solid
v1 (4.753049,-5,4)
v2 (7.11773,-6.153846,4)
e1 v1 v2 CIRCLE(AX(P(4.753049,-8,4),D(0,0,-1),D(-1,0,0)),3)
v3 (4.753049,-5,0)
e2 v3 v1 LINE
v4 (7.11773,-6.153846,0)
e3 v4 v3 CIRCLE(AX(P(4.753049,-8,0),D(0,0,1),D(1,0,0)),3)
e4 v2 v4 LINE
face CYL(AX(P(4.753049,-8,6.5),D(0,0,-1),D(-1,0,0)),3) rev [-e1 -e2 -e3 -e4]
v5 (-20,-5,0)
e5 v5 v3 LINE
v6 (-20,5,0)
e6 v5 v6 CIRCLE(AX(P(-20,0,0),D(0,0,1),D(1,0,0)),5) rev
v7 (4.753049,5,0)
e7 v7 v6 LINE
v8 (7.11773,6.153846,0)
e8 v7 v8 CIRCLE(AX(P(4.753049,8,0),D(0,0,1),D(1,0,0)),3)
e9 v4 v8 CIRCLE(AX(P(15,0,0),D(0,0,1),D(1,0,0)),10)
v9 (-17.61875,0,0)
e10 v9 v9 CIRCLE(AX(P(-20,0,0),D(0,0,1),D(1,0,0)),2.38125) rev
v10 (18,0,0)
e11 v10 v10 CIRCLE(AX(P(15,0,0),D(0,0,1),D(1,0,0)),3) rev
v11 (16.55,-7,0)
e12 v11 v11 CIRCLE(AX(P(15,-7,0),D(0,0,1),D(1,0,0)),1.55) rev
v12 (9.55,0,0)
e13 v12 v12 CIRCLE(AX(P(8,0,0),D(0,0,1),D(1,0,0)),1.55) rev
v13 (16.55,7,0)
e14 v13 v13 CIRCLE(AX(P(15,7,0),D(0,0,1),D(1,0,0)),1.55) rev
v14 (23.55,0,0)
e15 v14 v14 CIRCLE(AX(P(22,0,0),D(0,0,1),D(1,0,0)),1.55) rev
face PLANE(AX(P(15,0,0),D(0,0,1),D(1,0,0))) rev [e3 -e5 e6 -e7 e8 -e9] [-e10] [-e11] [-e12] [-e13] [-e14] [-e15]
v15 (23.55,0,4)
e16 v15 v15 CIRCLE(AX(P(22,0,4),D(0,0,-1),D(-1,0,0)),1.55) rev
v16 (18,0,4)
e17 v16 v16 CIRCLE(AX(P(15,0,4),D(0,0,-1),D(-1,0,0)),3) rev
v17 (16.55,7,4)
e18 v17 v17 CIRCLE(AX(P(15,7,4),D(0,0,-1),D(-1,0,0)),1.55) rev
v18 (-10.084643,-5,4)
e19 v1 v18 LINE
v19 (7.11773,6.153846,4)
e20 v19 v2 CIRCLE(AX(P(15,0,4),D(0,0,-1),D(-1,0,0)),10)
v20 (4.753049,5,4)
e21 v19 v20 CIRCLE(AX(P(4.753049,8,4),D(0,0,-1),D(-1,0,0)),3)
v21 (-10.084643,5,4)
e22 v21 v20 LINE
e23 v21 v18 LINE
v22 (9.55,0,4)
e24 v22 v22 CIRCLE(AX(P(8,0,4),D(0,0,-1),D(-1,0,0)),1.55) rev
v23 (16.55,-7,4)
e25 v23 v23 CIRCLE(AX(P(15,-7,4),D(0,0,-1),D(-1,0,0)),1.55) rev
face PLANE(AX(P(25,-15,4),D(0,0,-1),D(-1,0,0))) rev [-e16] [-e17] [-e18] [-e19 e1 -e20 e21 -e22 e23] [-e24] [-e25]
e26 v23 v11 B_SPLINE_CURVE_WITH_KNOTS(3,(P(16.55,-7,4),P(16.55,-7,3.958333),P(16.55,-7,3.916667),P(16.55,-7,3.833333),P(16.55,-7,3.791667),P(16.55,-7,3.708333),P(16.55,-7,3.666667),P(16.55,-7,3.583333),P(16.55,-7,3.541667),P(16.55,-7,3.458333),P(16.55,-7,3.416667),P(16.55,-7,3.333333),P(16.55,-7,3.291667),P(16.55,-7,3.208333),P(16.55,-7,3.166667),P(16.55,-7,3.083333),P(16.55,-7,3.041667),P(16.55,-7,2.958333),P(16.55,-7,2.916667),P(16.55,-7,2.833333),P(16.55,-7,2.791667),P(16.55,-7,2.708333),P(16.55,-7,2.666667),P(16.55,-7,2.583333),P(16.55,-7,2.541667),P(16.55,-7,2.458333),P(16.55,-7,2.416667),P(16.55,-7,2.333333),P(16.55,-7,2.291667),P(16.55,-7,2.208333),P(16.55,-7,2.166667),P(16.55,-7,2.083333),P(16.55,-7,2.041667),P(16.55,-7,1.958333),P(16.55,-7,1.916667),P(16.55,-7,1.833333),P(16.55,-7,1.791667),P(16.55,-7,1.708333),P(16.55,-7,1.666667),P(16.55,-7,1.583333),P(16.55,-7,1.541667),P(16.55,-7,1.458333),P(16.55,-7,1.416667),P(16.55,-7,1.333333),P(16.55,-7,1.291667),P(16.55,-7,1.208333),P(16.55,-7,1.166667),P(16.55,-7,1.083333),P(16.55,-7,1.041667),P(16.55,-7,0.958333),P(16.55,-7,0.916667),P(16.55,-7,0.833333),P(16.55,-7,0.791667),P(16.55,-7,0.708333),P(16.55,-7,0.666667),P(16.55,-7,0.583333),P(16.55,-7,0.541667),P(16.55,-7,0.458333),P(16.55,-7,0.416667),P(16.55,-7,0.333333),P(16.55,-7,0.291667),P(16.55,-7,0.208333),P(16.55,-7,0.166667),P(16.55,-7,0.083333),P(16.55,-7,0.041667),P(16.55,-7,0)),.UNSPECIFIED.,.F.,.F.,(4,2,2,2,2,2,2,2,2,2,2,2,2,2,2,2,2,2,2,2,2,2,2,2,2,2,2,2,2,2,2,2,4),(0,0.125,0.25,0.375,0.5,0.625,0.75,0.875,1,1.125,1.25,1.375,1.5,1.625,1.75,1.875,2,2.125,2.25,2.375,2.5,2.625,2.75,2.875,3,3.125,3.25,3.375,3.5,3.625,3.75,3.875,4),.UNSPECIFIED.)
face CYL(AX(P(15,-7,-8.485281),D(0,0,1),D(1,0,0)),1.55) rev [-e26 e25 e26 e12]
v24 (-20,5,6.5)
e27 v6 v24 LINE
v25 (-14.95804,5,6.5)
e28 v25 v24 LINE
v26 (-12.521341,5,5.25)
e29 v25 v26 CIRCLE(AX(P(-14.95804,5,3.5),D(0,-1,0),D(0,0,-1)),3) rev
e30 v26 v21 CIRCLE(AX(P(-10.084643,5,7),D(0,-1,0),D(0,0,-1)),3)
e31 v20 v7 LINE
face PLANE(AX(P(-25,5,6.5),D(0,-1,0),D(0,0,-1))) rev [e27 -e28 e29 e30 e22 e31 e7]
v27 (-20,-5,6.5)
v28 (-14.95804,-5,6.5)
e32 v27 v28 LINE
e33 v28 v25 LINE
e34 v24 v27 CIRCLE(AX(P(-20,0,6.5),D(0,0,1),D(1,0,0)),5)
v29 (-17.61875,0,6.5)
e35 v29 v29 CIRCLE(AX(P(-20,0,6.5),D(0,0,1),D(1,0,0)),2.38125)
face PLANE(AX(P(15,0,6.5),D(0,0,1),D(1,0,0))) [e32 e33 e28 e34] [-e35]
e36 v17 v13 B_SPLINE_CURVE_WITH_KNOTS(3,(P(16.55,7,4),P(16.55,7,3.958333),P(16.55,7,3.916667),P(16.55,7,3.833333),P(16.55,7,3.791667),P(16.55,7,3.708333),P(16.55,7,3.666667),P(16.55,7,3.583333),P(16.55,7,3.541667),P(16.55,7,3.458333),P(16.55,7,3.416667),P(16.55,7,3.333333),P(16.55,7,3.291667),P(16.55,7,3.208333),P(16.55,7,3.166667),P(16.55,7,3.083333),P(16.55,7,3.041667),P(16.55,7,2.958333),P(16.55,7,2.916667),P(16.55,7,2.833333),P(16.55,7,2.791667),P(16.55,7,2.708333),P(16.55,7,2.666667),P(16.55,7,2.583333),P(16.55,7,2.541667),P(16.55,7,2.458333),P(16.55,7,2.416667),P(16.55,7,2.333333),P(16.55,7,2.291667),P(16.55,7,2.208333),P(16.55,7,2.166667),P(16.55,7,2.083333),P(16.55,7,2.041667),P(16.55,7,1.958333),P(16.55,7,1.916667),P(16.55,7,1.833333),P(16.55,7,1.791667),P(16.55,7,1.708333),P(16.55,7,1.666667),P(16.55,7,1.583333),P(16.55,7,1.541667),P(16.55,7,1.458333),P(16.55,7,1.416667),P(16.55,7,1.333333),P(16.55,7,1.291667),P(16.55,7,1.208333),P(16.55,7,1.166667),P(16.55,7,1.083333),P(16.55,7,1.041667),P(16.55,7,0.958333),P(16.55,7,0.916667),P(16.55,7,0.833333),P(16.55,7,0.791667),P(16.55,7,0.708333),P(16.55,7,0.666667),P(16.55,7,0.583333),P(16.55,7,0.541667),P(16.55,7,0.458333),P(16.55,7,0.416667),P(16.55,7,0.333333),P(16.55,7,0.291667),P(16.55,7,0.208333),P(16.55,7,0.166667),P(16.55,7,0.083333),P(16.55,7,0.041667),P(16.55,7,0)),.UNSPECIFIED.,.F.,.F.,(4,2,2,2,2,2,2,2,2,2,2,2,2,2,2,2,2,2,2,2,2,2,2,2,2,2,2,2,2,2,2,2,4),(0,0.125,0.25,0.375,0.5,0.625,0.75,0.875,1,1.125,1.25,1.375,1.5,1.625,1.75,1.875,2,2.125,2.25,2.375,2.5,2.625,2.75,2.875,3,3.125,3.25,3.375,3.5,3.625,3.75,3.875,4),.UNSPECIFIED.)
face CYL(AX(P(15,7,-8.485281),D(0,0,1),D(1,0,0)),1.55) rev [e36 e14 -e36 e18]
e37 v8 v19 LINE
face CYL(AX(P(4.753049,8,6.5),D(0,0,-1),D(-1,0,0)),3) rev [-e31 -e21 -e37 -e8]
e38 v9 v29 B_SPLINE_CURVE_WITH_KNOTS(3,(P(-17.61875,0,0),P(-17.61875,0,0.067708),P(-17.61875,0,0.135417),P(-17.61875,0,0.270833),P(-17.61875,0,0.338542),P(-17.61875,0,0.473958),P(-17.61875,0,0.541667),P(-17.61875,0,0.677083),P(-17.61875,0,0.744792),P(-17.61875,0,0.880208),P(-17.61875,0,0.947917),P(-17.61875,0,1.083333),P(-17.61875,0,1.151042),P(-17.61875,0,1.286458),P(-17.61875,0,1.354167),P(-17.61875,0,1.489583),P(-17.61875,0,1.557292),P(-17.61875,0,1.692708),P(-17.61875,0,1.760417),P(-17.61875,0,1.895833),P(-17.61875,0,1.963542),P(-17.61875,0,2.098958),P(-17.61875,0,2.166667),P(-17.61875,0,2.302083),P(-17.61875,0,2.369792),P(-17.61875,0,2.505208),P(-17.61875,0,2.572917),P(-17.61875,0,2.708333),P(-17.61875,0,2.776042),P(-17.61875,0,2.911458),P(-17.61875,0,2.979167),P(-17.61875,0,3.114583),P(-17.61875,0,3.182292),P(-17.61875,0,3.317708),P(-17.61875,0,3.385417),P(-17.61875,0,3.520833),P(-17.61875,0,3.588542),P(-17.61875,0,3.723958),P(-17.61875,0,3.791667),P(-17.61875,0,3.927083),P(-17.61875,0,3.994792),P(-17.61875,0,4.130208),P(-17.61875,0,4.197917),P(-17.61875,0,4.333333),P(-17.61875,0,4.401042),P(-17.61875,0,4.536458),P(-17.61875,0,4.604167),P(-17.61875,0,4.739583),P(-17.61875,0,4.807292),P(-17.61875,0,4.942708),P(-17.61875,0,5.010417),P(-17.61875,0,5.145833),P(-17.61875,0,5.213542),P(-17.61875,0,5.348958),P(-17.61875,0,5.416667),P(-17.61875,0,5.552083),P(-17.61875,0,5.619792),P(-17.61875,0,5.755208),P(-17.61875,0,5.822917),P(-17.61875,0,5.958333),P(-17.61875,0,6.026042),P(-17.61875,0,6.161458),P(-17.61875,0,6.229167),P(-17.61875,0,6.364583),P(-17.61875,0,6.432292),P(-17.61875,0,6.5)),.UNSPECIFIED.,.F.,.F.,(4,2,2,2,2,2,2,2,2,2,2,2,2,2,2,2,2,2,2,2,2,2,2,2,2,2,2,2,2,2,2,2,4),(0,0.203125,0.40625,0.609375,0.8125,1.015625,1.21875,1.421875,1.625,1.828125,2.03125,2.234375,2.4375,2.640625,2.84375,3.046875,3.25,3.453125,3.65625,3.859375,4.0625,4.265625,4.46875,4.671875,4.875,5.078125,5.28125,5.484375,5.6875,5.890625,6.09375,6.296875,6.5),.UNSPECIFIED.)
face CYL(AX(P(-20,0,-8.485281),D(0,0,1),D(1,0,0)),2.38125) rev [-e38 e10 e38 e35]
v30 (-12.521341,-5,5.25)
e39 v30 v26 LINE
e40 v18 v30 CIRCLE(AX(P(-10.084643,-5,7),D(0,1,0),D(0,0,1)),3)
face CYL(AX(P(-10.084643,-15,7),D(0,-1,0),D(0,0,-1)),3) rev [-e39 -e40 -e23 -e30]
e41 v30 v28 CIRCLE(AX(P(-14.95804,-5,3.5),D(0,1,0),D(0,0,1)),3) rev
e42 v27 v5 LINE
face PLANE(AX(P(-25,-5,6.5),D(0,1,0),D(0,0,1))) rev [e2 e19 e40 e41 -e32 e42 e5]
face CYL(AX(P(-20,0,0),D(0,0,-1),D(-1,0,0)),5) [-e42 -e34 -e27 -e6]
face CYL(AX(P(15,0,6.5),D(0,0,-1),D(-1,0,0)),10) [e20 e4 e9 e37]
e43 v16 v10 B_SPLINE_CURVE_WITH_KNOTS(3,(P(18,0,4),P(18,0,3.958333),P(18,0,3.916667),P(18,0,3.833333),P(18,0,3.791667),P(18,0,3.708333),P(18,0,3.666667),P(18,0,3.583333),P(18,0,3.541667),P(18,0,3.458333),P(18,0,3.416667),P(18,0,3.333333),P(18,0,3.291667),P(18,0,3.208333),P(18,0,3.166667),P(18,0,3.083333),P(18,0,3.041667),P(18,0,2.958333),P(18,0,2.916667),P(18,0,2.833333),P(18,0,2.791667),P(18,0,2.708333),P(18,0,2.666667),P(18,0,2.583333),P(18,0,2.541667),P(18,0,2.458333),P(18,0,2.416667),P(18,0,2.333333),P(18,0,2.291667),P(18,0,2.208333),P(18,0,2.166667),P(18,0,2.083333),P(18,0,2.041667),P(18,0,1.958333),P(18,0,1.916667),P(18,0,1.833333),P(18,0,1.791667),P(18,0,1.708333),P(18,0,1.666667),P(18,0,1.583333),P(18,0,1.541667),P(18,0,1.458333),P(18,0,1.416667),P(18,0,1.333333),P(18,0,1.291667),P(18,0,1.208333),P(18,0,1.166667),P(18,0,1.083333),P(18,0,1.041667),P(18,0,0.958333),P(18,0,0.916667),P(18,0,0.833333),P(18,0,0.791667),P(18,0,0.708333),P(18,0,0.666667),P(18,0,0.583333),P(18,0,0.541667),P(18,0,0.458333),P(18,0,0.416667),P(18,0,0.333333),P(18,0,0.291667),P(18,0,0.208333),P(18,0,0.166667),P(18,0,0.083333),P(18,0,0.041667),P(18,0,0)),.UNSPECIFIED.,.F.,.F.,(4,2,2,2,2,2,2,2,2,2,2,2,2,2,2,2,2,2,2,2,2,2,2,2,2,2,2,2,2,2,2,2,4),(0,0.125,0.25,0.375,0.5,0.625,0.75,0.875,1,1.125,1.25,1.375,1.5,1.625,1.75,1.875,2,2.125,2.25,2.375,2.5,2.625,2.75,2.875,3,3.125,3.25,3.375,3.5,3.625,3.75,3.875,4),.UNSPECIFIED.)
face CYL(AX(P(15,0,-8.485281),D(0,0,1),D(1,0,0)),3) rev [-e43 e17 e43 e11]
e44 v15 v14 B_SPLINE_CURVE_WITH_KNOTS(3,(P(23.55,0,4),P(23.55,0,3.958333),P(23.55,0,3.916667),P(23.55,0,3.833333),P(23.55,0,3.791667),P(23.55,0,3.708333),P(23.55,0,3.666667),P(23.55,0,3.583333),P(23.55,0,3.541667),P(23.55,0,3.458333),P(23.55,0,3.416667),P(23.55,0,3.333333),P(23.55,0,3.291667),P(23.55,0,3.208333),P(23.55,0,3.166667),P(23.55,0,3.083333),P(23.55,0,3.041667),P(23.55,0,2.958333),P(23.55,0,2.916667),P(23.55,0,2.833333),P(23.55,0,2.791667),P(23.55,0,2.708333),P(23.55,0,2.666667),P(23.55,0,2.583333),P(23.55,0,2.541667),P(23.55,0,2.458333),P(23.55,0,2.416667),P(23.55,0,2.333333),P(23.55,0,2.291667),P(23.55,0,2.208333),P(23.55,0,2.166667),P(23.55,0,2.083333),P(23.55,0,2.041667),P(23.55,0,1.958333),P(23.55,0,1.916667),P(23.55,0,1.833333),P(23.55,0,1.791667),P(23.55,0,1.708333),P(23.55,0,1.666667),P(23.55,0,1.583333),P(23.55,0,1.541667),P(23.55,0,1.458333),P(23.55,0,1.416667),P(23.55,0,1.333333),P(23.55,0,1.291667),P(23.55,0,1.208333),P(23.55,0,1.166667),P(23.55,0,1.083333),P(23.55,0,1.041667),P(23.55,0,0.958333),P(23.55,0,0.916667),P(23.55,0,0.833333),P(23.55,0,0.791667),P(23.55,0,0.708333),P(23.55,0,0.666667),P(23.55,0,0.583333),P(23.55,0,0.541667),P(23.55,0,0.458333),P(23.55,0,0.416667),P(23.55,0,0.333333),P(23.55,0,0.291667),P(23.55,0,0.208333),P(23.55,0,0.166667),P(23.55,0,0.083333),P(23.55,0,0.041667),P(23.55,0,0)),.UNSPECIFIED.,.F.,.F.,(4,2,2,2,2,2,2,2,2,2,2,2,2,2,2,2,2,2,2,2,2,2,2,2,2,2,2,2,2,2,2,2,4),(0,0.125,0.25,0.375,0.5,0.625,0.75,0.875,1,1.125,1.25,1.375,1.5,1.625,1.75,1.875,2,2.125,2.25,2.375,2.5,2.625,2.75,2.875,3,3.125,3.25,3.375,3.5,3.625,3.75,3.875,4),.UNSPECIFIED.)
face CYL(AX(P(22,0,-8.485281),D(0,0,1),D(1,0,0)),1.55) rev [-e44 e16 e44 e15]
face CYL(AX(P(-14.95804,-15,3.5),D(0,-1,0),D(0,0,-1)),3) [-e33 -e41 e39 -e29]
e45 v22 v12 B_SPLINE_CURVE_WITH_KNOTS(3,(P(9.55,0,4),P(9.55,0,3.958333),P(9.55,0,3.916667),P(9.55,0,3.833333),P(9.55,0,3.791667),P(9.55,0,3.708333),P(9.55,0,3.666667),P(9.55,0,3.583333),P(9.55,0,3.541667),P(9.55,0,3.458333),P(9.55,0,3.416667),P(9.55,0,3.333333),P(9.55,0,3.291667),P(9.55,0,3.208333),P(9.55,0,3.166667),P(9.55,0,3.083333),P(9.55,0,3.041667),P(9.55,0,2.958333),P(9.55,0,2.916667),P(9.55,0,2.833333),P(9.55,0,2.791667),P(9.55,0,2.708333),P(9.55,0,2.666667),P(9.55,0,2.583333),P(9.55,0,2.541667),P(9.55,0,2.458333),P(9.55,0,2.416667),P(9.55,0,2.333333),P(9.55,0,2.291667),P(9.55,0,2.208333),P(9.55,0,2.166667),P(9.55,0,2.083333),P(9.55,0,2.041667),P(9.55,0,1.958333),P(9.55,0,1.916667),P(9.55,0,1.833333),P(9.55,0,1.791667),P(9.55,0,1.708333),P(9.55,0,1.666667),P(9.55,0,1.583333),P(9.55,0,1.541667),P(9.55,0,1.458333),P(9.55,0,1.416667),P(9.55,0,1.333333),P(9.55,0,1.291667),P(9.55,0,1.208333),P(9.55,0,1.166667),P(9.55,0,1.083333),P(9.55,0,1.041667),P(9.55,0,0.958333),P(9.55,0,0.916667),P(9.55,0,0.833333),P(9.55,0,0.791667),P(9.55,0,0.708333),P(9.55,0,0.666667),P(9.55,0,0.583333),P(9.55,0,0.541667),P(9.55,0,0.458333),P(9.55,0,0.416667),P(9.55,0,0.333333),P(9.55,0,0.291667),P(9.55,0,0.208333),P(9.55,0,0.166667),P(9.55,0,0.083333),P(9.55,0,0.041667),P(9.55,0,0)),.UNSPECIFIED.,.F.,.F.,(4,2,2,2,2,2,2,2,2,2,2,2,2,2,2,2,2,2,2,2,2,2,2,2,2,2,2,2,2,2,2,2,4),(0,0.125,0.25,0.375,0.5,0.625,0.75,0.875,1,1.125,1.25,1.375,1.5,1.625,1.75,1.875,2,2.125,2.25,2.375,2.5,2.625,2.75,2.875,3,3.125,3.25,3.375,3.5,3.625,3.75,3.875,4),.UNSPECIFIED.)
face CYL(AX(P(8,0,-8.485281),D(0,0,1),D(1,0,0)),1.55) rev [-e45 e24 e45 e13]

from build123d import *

# Parameters (mm, degrees)
BOSS_EXTRUDE3_DEPTH = 6.5
SKETCH9_R           = 2.38125
SKETCH9_R_2         = 3
SKETCH9_R_3         = 1.55
CUT_EXTRUDE4_DEPTH  = 6.5
SKETCH10_W          = 37
SKETCH10_H          = 2.5
CUT_EXTRUDE5_DEPTH  = 15
FILLET6_R           = 3
FILLET7_R           = 3
FILLET8_RADIUS      = 5
FILLET8_LENGTH      = 6.5


with BuildPart() as part:
    # Sketch8 → Boss-Extrude3 (new body)
    with BuildSketch(Plane.XY):
        with BuildLine():
            Line((-25, -5), (6.339745962, -5))
            ThreePointArc((6.339745962, -5), (25, 0), (6.339745962, 5))
            Line((6.339745962, 5), (-25, 5))
            Line((-25, 5), (-25, -5))
        make_face()
    extrude(amount=BOSS_EXTRUDE3_DEPTH)

    # Sketch9 → Cut-Extrude4 (cut)
    with BuildSketch(Plane.XY.offset(6.5)):
        with Locations((-20, 0)):
            Circle(SKETCH9_R)
        with Locations((15, 0)):
            Circle(SKETCH9_R_2)
        with Locations((22, 0)):
            Circle(SKETCH9_R_3)
        with Locations((15, -7)):
            Circle(SKETCH9_R_3)
        with Locations((8, 0)):
            Circle(SKETCH9_R_3)
        with Locations((15, 7)):
            Circle(SKETCH9_R_3)
    extrude(amount=-CUT_EXTRUDE4_DEPTH, mode=Mode.SUBTRACT)

    # Sketch10 → Cut-Extrude5 (cut, symmetric)
    with BuildSketch(Plane(origin=(0, 0, 0), x_dir=(1, 0, 0), z_dir=(0, 1, 0))):
        with Locations((6.5, -5.25)):
            Rectangle(SKETCH10_W, SKETCH10_H)
    extrude(amount=CUT_EXTRUDE5_DEPTH, both=True, mode=Mode.SUBTRACT)

    # Fillet6
    # the kernel refuses this fillet: 3 mm, written as the material it takes off along each edge
    with BuildSketch(Plane(origin=(-12, 12.395099729, 6.5), x_dir=(0, 0, -1), z_dir=(0, -1, 0))) as fillet6_piece_1:
        with BuildLine():
            CenterArc((3, -2.958039892), FILLET6_R, 99.594068227, 80.405931773)
            Line((0, -2.958039892), (-0.06, -2.958039892))
            Line((-0.06, -2.958039892), (-0.06, 0))
            Line((-0.06, 0), (0, 0.06))
            ThreePointArc((0, 0.06), (1.25, 0.06), (2.49, 0.059160798))
            Line((2.49, 0.059160798), (2.5, 0))
        make_face()
    extrude(amount=24.790199458, mode=Mode.SUBTRACT)

    # Fillet7
    fillet7_edges = [part.edges().sort_by_distance(p)[0] for p in [
        (6.339745962, -5, 2),
        (6.339745962, 5, 2),
        (-12, 0, 4),
    ]]
    fillet(fillet7_edges, radius=FILLET7_R)

    # Fillet8: full round fillet: the end face becomes a half cylinder, R = half its width
    fillet8_face = Plane((-25, 0, 3.25), x_dir=(0, 0, 1), z_dir=(-1, 0, 0))  # on the end face: x along it, z out of the body
    fillet8_slab = fillet8_face.offset(-FILLET8_RADIUS / 2) * Box(FILLET8_LENGTH, 2 * FILLET8_RADIUS, FILLET8_RADIUS, mode=Mode.PRIVATE)  # the body's end, R deep
    fillet8_round = Plane((-20, 0, 3.25), x_dir=(-1, 0, 0), z_dir=(0, 0, 1)) * Cylinder(FILLET8_RADIUS, FILLET8_LENGTH, mode=Mode.PRIVATE)  # its axis R under the face
    add(fillet8_slab - fillet8_round, mode=Mode.SUBTRACT)


solid = part.part
